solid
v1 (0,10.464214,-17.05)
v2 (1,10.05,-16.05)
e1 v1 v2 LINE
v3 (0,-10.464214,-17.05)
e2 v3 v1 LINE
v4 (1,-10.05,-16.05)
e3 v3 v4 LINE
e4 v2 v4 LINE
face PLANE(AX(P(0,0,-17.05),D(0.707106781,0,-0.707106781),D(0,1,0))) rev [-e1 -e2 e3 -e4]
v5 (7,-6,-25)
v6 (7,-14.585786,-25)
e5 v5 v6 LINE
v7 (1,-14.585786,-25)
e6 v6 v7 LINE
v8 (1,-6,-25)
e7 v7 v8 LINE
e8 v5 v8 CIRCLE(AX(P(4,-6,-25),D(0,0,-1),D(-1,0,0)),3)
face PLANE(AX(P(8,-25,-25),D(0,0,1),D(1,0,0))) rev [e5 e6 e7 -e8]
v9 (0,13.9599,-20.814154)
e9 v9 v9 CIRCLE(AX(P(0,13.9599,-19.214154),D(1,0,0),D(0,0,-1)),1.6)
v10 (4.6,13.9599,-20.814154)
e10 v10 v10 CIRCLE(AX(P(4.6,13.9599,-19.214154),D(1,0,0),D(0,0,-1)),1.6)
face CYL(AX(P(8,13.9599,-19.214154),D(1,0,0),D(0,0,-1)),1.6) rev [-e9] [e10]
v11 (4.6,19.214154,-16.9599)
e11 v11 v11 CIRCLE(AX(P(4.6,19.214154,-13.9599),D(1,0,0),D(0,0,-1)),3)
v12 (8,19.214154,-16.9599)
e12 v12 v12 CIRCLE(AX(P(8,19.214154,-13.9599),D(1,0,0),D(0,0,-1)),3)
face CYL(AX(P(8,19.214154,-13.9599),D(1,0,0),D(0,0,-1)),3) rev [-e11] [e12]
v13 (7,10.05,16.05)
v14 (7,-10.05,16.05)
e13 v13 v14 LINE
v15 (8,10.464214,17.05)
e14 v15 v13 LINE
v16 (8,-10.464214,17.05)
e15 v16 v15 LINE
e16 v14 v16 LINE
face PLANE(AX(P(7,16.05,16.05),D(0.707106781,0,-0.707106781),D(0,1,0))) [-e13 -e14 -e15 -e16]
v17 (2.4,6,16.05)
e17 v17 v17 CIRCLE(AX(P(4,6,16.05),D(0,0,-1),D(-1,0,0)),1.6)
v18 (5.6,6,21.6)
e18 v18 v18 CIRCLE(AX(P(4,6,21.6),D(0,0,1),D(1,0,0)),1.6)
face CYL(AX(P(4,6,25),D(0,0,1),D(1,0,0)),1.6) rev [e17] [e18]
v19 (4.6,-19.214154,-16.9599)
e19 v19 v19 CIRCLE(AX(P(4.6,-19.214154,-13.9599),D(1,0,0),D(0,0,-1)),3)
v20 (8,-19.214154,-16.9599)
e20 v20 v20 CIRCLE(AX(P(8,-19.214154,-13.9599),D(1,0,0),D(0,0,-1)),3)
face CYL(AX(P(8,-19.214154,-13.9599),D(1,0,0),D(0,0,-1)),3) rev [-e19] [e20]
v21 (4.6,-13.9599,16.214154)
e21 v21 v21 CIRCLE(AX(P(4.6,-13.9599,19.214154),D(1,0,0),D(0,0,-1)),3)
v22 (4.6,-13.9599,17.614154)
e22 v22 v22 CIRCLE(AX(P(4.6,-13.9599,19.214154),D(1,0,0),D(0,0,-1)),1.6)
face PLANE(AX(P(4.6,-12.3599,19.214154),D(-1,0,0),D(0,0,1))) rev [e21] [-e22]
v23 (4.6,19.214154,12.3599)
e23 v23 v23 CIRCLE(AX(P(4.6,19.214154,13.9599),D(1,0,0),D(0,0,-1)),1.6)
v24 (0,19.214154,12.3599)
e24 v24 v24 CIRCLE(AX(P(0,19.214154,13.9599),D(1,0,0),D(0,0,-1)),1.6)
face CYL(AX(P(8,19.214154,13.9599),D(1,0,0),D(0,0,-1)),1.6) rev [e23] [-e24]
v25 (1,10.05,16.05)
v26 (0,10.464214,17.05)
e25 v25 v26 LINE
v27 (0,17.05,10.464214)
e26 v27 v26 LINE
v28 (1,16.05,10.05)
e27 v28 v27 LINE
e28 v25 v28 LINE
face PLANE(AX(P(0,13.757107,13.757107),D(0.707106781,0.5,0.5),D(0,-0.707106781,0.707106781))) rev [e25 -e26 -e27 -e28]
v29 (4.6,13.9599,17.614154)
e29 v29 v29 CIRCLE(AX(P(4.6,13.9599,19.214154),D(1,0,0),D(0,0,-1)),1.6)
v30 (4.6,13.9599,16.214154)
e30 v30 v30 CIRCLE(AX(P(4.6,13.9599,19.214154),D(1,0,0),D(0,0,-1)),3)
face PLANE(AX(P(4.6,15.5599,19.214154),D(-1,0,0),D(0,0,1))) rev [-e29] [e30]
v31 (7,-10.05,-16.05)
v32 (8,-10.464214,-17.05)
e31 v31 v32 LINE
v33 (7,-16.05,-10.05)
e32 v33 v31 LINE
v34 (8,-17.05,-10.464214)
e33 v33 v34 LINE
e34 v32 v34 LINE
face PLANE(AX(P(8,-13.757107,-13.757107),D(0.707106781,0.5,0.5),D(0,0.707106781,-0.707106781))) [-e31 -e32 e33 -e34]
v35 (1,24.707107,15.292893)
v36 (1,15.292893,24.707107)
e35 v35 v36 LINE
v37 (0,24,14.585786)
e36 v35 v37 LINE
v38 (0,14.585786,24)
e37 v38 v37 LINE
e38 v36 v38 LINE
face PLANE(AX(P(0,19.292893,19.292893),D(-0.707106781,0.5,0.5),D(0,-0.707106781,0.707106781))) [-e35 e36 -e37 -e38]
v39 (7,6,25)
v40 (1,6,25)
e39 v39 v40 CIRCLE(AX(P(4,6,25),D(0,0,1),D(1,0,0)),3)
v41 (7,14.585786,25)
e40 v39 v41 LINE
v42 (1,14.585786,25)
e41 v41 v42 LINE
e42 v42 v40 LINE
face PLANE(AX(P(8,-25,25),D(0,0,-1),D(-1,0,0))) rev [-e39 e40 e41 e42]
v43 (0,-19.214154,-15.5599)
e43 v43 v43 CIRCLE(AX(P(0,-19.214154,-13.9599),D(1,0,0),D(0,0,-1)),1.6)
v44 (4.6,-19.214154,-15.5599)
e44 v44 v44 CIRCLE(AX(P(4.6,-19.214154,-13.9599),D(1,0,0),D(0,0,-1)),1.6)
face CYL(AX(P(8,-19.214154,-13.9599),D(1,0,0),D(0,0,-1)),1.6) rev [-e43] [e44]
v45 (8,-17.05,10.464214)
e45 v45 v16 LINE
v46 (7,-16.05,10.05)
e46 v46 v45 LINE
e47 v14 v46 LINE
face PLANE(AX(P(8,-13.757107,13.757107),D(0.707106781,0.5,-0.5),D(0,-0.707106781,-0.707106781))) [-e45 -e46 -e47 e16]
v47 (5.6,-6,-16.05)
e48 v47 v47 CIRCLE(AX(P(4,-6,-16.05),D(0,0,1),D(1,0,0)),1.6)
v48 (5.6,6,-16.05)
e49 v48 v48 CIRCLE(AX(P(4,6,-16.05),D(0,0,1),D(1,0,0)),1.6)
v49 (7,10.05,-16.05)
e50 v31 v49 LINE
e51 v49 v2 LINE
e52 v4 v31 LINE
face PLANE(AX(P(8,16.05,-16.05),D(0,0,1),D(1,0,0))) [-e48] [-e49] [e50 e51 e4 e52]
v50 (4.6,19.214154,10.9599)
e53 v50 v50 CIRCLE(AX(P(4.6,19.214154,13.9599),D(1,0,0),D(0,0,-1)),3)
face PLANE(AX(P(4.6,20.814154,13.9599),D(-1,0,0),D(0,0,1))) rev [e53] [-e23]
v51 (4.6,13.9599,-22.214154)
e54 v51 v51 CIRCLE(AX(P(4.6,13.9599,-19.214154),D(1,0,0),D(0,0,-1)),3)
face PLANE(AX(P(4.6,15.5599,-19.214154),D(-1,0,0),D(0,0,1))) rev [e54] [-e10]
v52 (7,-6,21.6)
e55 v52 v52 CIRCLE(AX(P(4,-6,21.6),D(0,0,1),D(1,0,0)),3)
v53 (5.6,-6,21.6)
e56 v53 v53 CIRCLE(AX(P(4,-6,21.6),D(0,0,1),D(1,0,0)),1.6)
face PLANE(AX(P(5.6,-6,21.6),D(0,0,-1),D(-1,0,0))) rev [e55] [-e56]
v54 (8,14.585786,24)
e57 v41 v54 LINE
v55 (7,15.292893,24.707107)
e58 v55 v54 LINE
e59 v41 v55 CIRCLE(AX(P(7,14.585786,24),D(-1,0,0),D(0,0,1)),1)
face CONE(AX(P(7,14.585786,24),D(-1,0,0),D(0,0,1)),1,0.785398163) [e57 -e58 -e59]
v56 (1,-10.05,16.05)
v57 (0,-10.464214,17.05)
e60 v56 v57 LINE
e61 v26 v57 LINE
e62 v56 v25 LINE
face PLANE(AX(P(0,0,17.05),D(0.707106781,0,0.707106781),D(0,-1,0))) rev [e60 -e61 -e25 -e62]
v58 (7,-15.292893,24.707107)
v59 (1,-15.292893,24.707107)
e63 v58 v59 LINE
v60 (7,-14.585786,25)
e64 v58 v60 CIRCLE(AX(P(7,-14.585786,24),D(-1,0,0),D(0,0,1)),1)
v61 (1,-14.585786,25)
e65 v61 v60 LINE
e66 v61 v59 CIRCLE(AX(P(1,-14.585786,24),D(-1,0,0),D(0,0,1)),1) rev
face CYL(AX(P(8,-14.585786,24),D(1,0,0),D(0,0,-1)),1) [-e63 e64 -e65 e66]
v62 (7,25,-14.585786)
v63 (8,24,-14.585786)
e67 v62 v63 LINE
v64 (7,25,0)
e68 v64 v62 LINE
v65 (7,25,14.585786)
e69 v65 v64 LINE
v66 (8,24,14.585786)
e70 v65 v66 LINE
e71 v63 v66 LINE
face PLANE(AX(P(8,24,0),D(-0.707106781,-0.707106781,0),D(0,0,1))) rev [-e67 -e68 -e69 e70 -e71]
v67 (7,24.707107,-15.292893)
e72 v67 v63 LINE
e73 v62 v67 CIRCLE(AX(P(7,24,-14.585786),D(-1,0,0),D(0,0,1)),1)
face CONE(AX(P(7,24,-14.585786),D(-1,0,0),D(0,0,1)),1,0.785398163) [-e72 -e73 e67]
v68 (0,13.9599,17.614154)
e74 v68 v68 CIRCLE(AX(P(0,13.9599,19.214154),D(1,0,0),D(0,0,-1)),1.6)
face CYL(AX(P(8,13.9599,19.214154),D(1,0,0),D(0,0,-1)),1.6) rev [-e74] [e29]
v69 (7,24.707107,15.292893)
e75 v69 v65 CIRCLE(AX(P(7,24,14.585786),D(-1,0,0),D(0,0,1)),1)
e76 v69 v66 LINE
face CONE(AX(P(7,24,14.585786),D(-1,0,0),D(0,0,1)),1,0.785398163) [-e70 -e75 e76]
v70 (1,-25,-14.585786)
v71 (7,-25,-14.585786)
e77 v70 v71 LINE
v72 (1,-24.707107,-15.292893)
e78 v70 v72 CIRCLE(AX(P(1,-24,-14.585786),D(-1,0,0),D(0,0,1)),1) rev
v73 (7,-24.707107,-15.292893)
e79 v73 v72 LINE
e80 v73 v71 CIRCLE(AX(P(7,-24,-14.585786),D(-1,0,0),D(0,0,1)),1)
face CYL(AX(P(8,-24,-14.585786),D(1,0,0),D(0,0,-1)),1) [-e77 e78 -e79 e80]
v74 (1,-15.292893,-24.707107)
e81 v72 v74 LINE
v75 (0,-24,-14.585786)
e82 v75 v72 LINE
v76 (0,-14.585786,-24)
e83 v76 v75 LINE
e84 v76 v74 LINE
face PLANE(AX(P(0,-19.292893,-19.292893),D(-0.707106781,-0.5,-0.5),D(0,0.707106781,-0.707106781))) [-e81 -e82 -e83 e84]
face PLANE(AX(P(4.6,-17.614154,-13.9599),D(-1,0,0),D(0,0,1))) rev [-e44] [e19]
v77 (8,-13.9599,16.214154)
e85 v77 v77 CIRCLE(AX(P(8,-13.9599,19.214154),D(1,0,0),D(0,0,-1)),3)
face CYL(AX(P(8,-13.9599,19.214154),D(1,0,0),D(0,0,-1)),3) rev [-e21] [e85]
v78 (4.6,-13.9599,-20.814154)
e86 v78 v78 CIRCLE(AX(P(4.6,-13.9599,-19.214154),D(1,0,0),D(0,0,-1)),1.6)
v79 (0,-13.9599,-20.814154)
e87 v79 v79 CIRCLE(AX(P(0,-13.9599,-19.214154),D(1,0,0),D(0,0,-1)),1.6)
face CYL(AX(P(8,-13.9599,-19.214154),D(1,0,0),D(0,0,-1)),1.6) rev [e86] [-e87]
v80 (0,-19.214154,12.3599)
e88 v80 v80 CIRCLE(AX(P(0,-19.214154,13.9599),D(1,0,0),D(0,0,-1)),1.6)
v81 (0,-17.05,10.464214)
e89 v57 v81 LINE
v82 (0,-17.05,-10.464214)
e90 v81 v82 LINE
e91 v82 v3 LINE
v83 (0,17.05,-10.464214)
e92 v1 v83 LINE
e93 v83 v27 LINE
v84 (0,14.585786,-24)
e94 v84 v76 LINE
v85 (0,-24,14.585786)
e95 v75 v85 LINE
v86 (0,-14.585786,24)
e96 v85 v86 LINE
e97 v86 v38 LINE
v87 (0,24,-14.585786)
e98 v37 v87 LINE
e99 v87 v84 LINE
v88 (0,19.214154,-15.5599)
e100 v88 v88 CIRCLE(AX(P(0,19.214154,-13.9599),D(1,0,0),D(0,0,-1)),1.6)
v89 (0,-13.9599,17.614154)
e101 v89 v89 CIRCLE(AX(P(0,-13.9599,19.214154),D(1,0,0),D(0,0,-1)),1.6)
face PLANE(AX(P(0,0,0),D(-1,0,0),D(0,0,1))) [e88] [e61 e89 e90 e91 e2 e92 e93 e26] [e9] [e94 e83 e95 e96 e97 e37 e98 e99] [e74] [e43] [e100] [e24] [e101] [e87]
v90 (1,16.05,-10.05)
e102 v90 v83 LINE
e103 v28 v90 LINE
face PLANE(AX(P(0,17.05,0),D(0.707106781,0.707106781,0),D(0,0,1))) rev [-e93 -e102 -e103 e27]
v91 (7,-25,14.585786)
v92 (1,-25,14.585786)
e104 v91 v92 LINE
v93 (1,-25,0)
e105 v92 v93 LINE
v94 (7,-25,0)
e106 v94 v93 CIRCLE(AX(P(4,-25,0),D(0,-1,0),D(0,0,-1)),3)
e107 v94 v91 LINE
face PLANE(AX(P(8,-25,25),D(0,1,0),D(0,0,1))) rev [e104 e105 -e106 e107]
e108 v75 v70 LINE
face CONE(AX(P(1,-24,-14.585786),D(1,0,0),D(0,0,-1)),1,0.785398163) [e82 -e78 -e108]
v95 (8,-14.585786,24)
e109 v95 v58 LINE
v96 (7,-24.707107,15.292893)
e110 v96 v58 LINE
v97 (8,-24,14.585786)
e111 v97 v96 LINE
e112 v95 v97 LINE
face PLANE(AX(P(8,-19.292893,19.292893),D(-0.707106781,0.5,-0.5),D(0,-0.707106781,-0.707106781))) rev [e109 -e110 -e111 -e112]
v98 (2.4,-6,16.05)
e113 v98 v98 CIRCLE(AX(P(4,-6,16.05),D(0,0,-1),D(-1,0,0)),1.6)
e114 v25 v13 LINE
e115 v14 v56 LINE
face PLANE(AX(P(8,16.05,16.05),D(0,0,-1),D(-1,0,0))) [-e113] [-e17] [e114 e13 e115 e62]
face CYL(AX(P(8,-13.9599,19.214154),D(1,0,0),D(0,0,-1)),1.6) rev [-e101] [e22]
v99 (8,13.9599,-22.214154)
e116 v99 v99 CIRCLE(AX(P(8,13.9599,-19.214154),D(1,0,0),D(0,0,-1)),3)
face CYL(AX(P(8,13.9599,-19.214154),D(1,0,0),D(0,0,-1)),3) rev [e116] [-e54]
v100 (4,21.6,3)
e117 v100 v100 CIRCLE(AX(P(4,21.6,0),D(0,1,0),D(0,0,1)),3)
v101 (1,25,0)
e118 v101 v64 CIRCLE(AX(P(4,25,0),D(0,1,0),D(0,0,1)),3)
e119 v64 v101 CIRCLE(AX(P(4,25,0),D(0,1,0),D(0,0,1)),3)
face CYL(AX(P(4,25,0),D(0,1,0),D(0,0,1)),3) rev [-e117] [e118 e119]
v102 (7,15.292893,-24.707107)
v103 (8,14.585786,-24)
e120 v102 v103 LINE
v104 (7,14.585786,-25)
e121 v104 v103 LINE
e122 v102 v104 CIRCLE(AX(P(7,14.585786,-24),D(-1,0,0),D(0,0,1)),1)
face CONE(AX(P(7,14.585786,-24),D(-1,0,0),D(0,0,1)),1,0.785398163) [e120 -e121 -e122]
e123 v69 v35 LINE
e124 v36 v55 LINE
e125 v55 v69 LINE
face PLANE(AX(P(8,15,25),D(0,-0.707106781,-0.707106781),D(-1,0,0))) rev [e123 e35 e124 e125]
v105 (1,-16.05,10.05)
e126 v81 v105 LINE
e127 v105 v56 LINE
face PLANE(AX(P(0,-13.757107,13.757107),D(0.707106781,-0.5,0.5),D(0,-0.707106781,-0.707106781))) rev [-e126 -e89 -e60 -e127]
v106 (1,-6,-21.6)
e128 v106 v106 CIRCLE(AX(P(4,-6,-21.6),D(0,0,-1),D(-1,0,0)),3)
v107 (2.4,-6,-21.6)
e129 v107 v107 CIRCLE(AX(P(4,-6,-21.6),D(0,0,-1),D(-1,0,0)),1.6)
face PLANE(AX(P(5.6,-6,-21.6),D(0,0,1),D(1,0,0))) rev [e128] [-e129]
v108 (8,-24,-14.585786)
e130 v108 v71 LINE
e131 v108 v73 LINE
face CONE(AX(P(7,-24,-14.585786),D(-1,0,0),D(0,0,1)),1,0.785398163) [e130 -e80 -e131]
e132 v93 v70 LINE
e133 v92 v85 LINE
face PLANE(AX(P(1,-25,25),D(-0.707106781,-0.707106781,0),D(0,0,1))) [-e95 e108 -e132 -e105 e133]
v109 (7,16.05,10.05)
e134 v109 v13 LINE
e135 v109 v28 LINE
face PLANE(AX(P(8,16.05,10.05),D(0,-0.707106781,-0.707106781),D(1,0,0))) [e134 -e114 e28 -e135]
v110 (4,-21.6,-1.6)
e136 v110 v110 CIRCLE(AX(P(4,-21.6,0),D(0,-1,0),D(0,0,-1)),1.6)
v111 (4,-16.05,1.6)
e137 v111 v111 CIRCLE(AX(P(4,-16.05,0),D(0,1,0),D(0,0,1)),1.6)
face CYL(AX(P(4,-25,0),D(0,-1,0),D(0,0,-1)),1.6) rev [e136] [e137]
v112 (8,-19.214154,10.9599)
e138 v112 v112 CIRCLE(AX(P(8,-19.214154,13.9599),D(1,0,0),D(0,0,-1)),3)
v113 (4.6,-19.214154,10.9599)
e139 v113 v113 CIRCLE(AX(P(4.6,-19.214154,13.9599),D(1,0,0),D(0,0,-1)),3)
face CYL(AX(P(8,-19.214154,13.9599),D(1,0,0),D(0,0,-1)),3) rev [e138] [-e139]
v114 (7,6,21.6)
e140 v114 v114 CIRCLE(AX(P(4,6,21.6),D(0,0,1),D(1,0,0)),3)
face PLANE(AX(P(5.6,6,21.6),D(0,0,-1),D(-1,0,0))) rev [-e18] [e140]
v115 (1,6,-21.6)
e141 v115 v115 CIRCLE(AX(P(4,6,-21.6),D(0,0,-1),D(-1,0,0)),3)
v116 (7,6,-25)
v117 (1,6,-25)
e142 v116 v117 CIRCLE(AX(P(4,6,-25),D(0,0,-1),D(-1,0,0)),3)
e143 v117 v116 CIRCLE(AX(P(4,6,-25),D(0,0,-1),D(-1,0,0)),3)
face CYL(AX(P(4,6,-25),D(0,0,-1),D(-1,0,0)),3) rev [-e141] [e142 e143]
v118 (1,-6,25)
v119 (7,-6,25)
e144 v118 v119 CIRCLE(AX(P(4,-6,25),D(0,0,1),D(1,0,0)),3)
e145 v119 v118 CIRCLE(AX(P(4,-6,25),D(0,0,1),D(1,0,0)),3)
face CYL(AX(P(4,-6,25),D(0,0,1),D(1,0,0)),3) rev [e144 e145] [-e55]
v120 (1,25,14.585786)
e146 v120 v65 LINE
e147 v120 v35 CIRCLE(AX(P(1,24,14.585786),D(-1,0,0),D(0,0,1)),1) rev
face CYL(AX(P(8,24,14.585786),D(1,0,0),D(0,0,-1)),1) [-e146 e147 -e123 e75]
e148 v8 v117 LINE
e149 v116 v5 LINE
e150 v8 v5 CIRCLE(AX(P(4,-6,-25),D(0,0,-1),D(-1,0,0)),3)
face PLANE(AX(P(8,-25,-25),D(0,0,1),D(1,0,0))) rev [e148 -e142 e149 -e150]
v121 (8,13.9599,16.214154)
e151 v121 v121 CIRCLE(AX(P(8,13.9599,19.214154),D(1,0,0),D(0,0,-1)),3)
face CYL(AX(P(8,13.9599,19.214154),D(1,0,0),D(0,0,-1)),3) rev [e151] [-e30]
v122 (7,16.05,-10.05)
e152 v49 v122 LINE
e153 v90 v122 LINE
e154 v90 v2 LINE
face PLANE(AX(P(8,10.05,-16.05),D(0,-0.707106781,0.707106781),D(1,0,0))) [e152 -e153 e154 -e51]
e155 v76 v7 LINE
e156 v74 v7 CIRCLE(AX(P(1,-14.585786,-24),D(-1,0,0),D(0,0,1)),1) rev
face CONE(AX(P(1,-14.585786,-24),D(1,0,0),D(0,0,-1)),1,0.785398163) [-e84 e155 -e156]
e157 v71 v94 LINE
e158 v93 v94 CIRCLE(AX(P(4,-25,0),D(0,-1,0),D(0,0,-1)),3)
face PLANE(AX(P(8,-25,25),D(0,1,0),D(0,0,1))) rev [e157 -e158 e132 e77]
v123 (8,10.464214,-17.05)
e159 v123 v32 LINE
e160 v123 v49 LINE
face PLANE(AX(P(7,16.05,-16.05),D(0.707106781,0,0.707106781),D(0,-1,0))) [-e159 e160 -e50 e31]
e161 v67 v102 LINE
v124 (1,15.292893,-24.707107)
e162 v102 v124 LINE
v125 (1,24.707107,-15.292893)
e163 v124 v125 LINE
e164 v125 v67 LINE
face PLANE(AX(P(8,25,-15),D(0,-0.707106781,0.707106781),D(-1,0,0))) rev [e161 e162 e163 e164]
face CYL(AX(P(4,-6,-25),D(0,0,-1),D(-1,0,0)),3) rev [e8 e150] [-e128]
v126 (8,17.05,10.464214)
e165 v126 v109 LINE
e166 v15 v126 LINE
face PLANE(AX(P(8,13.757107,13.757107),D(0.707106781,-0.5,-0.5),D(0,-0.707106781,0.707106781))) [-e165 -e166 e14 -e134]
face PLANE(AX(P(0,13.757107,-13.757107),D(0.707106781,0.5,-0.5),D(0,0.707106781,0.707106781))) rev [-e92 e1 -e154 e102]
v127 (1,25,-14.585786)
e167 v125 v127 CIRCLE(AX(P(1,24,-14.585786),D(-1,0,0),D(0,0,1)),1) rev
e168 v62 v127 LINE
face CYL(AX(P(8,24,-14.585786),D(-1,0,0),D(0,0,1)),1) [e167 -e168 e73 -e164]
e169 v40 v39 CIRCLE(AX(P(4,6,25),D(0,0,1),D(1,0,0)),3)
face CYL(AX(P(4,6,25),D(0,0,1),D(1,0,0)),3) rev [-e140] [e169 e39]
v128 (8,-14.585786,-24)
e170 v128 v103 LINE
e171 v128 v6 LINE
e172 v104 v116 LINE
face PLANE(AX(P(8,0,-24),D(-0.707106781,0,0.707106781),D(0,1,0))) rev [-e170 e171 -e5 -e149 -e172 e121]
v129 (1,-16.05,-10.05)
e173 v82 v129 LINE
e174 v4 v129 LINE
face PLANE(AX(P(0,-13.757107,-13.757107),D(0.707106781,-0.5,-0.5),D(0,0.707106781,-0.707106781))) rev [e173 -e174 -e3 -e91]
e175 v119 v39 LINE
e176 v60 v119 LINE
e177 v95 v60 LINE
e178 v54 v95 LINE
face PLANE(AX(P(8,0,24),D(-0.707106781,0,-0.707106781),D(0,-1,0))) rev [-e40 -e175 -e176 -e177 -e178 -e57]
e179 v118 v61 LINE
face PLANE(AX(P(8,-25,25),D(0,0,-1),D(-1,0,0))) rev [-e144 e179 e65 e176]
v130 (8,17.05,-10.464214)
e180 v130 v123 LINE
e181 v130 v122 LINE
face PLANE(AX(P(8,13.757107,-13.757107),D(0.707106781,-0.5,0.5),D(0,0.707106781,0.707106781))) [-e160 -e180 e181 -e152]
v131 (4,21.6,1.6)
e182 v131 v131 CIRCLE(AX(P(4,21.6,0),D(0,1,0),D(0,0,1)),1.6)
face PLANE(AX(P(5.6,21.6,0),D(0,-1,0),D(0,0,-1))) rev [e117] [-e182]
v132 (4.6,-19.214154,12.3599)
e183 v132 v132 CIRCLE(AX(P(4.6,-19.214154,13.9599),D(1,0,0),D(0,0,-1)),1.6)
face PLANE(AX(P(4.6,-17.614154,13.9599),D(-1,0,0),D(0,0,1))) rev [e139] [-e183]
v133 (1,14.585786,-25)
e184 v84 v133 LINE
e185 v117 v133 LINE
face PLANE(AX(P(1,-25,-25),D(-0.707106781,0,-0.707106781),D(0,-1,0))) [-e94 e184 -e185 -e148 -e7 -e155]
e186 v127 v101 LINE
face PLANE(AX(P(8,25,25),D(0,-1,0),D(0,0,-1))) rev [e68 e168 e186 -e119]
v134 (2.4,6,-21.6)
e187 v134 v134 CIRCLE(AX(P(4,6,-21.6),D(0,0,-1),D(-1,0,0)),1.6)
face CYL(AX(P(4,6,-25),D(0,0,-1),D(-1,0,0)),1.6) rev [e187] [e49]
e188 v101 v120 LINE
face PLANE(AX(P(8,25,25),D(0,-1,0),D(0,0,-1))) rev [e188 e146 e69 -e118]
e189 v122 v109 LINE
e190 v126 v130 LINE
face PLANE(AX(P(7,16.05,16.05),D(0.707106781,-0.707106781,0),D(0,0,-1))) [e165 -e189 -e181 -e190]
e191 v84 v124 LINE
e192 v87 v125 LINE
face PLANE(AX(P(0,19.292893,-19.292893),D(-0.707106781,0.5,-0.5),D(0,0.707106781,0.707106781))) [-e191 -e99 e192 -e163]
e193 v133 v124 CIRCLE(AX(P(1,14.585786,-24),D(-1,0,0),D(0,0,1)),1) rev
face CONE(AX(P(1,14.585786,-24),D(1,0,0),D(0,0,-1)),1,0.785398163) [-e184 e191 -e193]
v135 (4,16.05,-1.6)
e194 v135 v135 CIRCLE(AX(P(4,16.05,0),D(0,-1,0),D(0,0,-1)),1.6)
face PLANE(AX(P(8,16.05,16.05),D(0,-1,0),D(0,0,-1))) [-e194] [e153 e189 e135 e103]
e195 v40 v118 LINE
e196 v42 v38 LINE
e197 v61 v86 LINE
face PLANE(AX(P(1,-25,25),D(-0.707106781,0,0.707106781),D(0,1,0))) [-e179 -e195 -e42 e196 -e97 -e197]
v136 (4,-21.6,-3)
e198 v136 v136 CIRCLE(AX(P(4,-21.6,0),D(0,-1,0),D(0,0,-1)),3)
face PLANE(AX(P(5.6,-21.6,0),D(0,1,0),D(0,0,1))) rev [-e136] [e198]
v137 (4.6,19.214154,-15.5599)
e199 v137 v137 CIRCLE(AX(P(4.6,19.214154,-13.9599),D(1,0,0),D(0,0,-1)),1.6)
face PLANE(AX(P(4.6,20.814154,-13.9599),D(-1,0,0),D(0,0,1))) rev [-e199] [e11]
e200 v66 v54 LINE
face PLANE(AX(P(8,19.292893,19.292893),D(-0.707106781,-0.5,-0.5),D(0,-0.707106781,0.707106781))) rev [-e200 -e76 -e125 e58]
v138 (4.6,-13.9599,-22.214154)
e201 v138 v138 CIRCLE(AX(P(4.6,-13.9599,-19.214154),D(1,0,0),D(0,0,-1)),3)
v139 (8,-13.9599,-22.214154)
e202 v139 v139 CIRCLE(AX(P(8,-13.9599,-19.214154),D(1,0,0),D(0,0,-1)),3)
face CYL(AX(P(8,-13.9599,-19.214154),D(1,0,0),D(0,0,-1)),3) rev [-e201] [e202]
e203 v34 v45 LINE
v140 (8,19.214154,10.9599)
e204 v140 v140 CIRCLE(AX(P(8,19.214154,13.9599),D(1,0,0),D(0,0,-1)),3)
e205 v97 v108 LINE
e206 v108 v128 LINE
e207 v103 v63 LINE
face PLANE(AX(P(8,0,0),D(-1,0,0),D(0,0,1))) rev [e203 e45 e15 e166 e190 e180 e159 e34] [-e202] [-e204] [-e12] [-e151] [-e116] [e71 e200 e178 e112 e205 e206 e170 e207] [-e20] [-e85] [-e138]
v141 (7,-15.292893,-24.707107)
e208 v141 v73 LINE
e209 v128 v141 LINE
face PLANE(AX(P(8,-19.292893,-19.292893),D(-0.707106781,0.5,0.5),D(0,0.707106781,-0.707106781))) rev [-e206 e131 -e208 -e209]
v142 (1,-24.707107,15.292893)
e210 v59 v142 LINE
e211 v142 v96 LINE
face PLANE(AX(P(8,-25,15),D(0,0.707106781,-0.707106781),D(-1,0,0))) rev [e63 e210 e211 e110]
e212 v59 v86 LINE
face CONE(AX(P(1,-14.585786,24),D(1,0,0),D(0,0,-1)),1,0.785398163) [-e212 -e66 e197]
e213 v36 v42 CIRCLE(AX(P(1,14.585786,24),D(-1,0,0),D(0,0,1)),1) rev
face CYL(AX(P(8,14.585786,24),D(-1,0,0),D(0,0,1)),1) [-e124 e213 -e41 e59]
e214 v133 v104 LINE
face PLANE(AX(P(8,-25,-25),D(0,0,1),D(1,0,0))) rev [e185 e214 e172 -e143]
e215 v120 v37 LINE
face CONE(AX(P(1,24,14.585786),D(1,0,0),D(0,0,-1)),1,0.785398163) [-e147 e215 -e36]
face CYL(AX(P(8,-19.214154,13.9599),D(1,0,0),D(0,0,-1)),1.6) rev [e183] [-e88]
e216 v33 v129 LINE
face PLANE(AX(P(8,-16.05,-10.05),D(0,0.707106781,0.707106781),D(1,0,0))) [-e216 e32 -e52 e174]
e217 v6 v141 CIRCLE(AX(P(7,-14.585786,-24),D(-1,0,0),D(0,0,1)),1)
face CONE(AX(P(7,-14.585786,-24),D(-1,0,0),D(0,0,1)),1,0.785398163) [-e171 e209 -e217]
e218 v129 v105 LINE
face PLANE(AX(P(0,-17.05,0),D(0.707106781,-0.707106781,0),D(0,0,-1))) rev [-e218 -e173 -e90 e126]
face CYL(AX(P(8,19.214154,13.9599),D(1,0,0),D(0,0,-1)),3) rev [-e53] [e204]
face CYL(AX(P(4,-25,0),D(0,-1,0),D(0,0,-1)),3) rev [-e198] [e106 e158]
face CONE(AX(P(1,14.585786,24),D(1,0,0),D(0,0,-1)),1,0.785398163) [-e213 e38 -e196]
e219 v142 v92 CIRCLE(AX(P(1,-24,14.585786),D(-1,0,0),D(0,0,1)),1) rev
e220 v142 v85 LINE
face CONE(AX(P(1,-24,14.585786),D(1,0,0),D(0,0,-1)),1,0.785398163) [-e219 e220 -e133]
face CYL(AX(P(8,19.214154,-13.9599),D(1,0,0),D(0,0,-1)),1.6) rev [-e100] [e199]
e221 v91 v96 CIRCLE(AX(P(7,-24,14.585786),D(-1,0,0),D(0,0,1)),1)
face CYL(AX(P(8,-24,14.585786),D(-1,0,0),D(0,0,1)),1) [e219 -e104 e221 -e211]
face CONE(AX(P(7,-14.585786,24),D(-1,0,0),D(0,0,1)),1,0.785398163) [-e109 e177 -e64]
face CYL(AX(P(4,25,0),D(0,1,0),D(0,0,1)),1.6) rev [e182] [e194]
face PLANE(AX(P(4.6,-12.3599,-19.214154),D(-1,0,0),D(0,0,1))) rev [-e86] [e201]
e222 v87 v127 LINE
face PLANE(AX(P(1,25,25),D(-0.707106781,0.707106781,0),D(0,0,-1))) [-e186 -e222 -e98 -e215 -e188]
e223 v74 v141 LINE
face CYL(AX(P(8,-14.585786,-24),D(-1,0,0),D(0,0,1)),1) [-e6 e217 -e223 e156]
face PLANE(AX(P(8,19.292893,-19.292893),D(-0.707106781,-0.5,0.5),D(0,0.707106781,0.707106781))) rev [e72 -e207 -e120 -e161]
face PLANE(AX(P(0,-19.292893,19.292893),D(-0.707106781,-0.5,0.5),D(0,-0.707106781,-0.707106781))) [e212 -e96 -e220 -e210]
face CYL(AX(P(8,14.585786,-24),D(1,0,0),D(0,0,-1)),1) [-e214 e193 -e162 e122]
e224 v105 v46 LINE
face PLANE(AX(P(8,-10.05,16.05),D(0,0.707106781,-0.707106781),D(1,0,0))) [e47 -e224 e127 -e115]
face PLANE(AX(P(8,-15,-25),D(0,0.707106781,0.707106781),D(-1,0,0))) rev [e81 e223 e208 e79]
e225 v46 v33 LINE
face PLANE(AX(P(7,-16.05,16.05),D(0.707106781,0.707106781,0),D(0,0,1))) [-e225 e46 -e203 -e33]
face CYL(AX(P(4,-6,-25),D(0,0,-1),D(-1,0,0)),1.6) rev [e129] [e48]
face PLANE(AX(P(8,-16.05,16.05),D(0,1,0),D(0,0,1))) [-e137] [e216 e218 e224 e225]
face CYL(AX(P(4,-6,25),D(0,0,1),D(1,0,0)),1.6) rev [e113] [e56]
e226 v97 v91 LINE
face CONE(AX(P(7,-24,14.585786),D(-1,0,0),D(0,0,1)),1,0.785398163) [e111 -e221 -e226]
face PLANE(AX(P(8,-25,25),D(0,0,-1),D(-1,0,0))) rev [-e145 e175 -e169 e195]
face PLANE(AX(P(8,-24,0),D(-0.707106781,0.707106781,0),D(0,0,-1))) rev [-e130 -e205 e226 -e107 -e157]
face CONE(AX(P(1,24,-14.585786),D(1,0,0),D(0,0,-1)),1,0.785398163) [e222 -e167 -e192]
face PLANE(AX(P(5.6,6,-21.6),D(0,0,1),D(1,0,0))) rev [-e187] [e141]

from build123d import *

# Parameters (mm, degrees)
SKETCH_1_W                   = 50
SKETCH_1_H                   = 50
SKETCH_1_W_2                 = 32.1
SKETCH_1_H_2                 = 32.1
EXTRUDE_1_DEPTH              = 8
CHAMFER_1_SIZE               = 10
CHAMFER_2_SIZE               = 6
HOLE_WIZARD_M3_1_D           = 3.2
HOLE_WIZARD_M3_1_CBORE_D     = 6
HOLE_WIZARD_M3_1_CBORE_DEPTH = 3.4
HOLE_WIZARD_M3_2_D           = 3.2
HOLE_WIZARD_M3_2_DEPTH       = 8.95
HOLE_WIZARD_M3_2_CBORE_D     = 6
HOLE_WIZARD_M3_2_CBORE_DEPTH = 3.4
HOLE_WIZARD_M3_3_D           = 3.2
HOLE_WIZARD_M3_3_DEPTH       = 8.95
HOLE_WIZARD_M3_3_CBORE_D     = 6
HOLE_WIZARD_M3_3_CBORE_DEPTH = 3.4
HOLE_WIZARD_M3_4_D           = 3.2
HOLE_WIZARD_M3_4_CBORE_D     = 6
HOLE_WIZARD_M3_4_CBORE_DEPTH = 3.4
HOLE_START                   = -25
HOLE_WIZARD_M3_5_OUTLINE_R   = 3
HOLE_WIZARD_M3_5_DEPTH       = 3.4
HOLE_START_2                 = -21.6
HOLE_WIZARD_M3_5_2_OUTLINE_R = 1.6
HOLE_WIZARD_M3_5_2_DEPTH     = 5.55
FILLET_1_R                   = 1
CHAMFER_4_SIZE               = 1


# Read off the part's stored shape, not the designer's step: M3 六角圆柱头螺钉的柱形沉头孔5
with BuildPart() as part:
    # 草图1 → 凸台-拉伸1 (new body)
    with BuildSketch(Plane(origin=(0, 0, 0), x_dir=(0, 0, -1), z_dir=(1, 0, 0))):
        Rectangle(SKETCH_1_W, SKETCH_1_H)
        Rectangle(SKETCH_1_W_2, SKETCH_1_H_2, mode=Mode.SUBTRACT)
    extrude(amount=EXTRUDE_1_DEPTH)

    # 倒角1
    chamfer_1_edges = [part.edges().sort_by_distance(p)[0] for p in [
        (4, -25, -25),
        (4, -25, 25),
        (4, 25, 25),
        (4, 25, -25),
    ]]
    chamfer(chamfer_1_edges, length=CHAMFER_1_SIZE)

    # 倒角2
    chamfer_2_edges = [part.edges().sort_by_distance(p)[0] for p in [
        (4, -16.05, -16.05),
        (4, 16.05, -16.05),
        (4, 16.05, 16.05),
        (4, -16.05, 16.05),
    ]]
    chamfer(chamfer_2_edges, length=CHAMFER_2_SIZE)

    # M3 六角圆柱头螺钉的柱形沉头孔1 (through all)
    with Locations(Plane(origin=(8, 0, 0), x_dir=(0, 0, -1), z_dir=(1, 0, 0))):
        with Locations((-13.959899742, 19.214153616), (13.959899742, 19.214153616), (19.214153616, -13.959899742), (-13.959899742, -19.214153616), (-19.214153616, 13.959899742), (19.214153616, 13.959899742), (13.959899742, -19.214153616), (-19.214153616, -13.959899742)):
            CounterBoreHole(HOLE_WIZARD_M3_1_D / 2, HOLE_WIZARD_M3_1_CBORE_D / 2, HOLE_WIZARD_M3_1_CBORE_DEPTH)

    # M3 六角圆柱头螺钉的柱形沉头孔2
    with Locations(Plane(origin=(0, 25, 0), x_dir=(1, 0, 0), z_dir=(0, 1, 0))):
        with Locations((4, 0)):
            CounterBoreHole(HOLE_WIZARD_M3_2_D / 2, HOLE_WIZARD_M3_2_CBORE_D / 2, HOLE_WIZARD_M3_2_CBORE_DEPTH, depth=HOLE_WIZARD_M3_2_DEPTH)

    # M3 六角圆柱头螺钉的柱形沉头孔3
    with Locations(Plane(origin=(0, 0, -25), x_dir=(-1, 0, 0), z_dir=(0, 0, -1))):
        with Locations((-4, 6), (-4, -6)):
            CounterBoreHole(HOLE_WIZARD_M3_3_D / 2, HOLE_WIZARD_M3_3_CBORE_D / 2, HOLE_WIZARD_M3_3_CBORE_DEPTH, depth=HOLE_WIZARD_M3_3_DEPTH)

    # M3 六角圆柱头螺钉的柱形沉头孔4 (through all)
    with Locations(Plane.XY.offset(25)):
        with Locations((4, -6), (4, 6)):
            CounterBoreHole(HOLE_WIZARD_M3_4_D / 2, HOLE_WIZARD_M3_4_CBORE_D / 2, HOLE_WIZARD_M3_4_CBORE_DEPTH)

    # M3 六角圆柱头螺钉的柱形沉头孔5 outline → M3 六角圆柱头螺钉的柱形沉头孔5 (cut)
    with BuildSketch(Plane(origin=(0, 0, 0), x_dir=(1, 0, 0), z_dir=(0, 1, 0)).offset(HOLE_START)):
        with Locations((4, 0)):
            Circle(HOLE_WIZARD_M3_5_OUTLINE_R)
    extrude(amount=HOLE_WIZARD_M3_5_DEPTH, mode=Mode.SUBTRACT)

    # Hole Wizard M3 _5 2 outline → Hole Wizard M3 _5 2 (cut)
    with BuildSketch(Plane(origin=(0, 0, 0), x_dir=(1, 0, 0), z_dir=(0, 1, 0)).offset(HOLE_START_2)):
        with Locations((4, 0)):
            Circle(HOLE_WIZARD_M3_5_2_OUTLINE_R)
    extrude(amount=HOLE_WIZARD_M3_5_2_DEPTH, mode=Mode.SUBTRACT)

    # 圆角1
    fillet_1_edges = [part.edges().sort_by_distance(p)[0] for p in [
        (4, -25, -15),
        (4, -25, 15),
        (4, 15, 25),
        (4, -15, 25),
        (4, 15, -25),
        (4, -15, -25),
        (4, 25, 15),
        (4, 25, -15),
    ]]
    fillet(fillet_1_edges, radius=FILLET_1_R)

    # 倒角4
    chamfer_4_edges = [part.edges().sort_by_distance(p)[0] for p in [
        (8, 25, 0),
        (0, 25, 0),
        (8, 0, 25),
        (8, -20, 20),
        (8, -25, 0),
        (8, -20, -20),
        (8, 0, -25),
        (8, 20, -20),
        (8, 20, 20),
        (8, -14.96846987, 24.923879533),
        (8, -24.923879533, 14.96846987),
        (8, -24.923879533, -14.96846987),
        (8, -14.96846987, -24.923879533),
        (8, 14.96846987, -24.923879533),
        (8, 24.923879533, -14.96846987),
        (8, 14.96846987, 24.923879533),
        (8, 24.923879533, 14.96846987),
        (0, 20, 20),
        (0, -25, 0),
        (0, -20, 20),
        (0, 0, 25),
        (0, 20, -20),
        (0, 0, -25),
        (0, -20, -20),
        (0, -14.96846987, 24.923879533),
        (0, -24.923879533, 14.96846987),
        (0, -24.923879533, -14.96846987),
        (0, -14.96846987, -24.923879533),
        (0, 14.96846987, -24.923879533),
        (0, 24.923879533, -14.96846987),
        (0, 14.96846987, 24.923879533),
        (0, 24.923879533, 14.96846987),
        (0, 0, 16.05),
        (8, 0, 16.05),
        (0, -16.05, 0),
        (8, -16.05, 0),
        (0, 0, -16.05),
        (8, 0, -16.05),
        (0, 16.05, 0),
        (8, 16.05, 0),
        (0, -13.05, 13.05),
        (8, -13.05, 13.05),
        (0, -13.05, -13.05),
        (8, -13.05, -13.05),
        (0, 13.05, -13.05),
        (8, 13.05, -13.05),
        (0, 13.05, 13.05),
        (8, 13.05, 13.05),
    ]]
    chamfer(chamfer_4_edges, length=CHAMFER_4_SIZE - 0.0001)  # a hair under: the kernel refuses the full size


solid = part.part
